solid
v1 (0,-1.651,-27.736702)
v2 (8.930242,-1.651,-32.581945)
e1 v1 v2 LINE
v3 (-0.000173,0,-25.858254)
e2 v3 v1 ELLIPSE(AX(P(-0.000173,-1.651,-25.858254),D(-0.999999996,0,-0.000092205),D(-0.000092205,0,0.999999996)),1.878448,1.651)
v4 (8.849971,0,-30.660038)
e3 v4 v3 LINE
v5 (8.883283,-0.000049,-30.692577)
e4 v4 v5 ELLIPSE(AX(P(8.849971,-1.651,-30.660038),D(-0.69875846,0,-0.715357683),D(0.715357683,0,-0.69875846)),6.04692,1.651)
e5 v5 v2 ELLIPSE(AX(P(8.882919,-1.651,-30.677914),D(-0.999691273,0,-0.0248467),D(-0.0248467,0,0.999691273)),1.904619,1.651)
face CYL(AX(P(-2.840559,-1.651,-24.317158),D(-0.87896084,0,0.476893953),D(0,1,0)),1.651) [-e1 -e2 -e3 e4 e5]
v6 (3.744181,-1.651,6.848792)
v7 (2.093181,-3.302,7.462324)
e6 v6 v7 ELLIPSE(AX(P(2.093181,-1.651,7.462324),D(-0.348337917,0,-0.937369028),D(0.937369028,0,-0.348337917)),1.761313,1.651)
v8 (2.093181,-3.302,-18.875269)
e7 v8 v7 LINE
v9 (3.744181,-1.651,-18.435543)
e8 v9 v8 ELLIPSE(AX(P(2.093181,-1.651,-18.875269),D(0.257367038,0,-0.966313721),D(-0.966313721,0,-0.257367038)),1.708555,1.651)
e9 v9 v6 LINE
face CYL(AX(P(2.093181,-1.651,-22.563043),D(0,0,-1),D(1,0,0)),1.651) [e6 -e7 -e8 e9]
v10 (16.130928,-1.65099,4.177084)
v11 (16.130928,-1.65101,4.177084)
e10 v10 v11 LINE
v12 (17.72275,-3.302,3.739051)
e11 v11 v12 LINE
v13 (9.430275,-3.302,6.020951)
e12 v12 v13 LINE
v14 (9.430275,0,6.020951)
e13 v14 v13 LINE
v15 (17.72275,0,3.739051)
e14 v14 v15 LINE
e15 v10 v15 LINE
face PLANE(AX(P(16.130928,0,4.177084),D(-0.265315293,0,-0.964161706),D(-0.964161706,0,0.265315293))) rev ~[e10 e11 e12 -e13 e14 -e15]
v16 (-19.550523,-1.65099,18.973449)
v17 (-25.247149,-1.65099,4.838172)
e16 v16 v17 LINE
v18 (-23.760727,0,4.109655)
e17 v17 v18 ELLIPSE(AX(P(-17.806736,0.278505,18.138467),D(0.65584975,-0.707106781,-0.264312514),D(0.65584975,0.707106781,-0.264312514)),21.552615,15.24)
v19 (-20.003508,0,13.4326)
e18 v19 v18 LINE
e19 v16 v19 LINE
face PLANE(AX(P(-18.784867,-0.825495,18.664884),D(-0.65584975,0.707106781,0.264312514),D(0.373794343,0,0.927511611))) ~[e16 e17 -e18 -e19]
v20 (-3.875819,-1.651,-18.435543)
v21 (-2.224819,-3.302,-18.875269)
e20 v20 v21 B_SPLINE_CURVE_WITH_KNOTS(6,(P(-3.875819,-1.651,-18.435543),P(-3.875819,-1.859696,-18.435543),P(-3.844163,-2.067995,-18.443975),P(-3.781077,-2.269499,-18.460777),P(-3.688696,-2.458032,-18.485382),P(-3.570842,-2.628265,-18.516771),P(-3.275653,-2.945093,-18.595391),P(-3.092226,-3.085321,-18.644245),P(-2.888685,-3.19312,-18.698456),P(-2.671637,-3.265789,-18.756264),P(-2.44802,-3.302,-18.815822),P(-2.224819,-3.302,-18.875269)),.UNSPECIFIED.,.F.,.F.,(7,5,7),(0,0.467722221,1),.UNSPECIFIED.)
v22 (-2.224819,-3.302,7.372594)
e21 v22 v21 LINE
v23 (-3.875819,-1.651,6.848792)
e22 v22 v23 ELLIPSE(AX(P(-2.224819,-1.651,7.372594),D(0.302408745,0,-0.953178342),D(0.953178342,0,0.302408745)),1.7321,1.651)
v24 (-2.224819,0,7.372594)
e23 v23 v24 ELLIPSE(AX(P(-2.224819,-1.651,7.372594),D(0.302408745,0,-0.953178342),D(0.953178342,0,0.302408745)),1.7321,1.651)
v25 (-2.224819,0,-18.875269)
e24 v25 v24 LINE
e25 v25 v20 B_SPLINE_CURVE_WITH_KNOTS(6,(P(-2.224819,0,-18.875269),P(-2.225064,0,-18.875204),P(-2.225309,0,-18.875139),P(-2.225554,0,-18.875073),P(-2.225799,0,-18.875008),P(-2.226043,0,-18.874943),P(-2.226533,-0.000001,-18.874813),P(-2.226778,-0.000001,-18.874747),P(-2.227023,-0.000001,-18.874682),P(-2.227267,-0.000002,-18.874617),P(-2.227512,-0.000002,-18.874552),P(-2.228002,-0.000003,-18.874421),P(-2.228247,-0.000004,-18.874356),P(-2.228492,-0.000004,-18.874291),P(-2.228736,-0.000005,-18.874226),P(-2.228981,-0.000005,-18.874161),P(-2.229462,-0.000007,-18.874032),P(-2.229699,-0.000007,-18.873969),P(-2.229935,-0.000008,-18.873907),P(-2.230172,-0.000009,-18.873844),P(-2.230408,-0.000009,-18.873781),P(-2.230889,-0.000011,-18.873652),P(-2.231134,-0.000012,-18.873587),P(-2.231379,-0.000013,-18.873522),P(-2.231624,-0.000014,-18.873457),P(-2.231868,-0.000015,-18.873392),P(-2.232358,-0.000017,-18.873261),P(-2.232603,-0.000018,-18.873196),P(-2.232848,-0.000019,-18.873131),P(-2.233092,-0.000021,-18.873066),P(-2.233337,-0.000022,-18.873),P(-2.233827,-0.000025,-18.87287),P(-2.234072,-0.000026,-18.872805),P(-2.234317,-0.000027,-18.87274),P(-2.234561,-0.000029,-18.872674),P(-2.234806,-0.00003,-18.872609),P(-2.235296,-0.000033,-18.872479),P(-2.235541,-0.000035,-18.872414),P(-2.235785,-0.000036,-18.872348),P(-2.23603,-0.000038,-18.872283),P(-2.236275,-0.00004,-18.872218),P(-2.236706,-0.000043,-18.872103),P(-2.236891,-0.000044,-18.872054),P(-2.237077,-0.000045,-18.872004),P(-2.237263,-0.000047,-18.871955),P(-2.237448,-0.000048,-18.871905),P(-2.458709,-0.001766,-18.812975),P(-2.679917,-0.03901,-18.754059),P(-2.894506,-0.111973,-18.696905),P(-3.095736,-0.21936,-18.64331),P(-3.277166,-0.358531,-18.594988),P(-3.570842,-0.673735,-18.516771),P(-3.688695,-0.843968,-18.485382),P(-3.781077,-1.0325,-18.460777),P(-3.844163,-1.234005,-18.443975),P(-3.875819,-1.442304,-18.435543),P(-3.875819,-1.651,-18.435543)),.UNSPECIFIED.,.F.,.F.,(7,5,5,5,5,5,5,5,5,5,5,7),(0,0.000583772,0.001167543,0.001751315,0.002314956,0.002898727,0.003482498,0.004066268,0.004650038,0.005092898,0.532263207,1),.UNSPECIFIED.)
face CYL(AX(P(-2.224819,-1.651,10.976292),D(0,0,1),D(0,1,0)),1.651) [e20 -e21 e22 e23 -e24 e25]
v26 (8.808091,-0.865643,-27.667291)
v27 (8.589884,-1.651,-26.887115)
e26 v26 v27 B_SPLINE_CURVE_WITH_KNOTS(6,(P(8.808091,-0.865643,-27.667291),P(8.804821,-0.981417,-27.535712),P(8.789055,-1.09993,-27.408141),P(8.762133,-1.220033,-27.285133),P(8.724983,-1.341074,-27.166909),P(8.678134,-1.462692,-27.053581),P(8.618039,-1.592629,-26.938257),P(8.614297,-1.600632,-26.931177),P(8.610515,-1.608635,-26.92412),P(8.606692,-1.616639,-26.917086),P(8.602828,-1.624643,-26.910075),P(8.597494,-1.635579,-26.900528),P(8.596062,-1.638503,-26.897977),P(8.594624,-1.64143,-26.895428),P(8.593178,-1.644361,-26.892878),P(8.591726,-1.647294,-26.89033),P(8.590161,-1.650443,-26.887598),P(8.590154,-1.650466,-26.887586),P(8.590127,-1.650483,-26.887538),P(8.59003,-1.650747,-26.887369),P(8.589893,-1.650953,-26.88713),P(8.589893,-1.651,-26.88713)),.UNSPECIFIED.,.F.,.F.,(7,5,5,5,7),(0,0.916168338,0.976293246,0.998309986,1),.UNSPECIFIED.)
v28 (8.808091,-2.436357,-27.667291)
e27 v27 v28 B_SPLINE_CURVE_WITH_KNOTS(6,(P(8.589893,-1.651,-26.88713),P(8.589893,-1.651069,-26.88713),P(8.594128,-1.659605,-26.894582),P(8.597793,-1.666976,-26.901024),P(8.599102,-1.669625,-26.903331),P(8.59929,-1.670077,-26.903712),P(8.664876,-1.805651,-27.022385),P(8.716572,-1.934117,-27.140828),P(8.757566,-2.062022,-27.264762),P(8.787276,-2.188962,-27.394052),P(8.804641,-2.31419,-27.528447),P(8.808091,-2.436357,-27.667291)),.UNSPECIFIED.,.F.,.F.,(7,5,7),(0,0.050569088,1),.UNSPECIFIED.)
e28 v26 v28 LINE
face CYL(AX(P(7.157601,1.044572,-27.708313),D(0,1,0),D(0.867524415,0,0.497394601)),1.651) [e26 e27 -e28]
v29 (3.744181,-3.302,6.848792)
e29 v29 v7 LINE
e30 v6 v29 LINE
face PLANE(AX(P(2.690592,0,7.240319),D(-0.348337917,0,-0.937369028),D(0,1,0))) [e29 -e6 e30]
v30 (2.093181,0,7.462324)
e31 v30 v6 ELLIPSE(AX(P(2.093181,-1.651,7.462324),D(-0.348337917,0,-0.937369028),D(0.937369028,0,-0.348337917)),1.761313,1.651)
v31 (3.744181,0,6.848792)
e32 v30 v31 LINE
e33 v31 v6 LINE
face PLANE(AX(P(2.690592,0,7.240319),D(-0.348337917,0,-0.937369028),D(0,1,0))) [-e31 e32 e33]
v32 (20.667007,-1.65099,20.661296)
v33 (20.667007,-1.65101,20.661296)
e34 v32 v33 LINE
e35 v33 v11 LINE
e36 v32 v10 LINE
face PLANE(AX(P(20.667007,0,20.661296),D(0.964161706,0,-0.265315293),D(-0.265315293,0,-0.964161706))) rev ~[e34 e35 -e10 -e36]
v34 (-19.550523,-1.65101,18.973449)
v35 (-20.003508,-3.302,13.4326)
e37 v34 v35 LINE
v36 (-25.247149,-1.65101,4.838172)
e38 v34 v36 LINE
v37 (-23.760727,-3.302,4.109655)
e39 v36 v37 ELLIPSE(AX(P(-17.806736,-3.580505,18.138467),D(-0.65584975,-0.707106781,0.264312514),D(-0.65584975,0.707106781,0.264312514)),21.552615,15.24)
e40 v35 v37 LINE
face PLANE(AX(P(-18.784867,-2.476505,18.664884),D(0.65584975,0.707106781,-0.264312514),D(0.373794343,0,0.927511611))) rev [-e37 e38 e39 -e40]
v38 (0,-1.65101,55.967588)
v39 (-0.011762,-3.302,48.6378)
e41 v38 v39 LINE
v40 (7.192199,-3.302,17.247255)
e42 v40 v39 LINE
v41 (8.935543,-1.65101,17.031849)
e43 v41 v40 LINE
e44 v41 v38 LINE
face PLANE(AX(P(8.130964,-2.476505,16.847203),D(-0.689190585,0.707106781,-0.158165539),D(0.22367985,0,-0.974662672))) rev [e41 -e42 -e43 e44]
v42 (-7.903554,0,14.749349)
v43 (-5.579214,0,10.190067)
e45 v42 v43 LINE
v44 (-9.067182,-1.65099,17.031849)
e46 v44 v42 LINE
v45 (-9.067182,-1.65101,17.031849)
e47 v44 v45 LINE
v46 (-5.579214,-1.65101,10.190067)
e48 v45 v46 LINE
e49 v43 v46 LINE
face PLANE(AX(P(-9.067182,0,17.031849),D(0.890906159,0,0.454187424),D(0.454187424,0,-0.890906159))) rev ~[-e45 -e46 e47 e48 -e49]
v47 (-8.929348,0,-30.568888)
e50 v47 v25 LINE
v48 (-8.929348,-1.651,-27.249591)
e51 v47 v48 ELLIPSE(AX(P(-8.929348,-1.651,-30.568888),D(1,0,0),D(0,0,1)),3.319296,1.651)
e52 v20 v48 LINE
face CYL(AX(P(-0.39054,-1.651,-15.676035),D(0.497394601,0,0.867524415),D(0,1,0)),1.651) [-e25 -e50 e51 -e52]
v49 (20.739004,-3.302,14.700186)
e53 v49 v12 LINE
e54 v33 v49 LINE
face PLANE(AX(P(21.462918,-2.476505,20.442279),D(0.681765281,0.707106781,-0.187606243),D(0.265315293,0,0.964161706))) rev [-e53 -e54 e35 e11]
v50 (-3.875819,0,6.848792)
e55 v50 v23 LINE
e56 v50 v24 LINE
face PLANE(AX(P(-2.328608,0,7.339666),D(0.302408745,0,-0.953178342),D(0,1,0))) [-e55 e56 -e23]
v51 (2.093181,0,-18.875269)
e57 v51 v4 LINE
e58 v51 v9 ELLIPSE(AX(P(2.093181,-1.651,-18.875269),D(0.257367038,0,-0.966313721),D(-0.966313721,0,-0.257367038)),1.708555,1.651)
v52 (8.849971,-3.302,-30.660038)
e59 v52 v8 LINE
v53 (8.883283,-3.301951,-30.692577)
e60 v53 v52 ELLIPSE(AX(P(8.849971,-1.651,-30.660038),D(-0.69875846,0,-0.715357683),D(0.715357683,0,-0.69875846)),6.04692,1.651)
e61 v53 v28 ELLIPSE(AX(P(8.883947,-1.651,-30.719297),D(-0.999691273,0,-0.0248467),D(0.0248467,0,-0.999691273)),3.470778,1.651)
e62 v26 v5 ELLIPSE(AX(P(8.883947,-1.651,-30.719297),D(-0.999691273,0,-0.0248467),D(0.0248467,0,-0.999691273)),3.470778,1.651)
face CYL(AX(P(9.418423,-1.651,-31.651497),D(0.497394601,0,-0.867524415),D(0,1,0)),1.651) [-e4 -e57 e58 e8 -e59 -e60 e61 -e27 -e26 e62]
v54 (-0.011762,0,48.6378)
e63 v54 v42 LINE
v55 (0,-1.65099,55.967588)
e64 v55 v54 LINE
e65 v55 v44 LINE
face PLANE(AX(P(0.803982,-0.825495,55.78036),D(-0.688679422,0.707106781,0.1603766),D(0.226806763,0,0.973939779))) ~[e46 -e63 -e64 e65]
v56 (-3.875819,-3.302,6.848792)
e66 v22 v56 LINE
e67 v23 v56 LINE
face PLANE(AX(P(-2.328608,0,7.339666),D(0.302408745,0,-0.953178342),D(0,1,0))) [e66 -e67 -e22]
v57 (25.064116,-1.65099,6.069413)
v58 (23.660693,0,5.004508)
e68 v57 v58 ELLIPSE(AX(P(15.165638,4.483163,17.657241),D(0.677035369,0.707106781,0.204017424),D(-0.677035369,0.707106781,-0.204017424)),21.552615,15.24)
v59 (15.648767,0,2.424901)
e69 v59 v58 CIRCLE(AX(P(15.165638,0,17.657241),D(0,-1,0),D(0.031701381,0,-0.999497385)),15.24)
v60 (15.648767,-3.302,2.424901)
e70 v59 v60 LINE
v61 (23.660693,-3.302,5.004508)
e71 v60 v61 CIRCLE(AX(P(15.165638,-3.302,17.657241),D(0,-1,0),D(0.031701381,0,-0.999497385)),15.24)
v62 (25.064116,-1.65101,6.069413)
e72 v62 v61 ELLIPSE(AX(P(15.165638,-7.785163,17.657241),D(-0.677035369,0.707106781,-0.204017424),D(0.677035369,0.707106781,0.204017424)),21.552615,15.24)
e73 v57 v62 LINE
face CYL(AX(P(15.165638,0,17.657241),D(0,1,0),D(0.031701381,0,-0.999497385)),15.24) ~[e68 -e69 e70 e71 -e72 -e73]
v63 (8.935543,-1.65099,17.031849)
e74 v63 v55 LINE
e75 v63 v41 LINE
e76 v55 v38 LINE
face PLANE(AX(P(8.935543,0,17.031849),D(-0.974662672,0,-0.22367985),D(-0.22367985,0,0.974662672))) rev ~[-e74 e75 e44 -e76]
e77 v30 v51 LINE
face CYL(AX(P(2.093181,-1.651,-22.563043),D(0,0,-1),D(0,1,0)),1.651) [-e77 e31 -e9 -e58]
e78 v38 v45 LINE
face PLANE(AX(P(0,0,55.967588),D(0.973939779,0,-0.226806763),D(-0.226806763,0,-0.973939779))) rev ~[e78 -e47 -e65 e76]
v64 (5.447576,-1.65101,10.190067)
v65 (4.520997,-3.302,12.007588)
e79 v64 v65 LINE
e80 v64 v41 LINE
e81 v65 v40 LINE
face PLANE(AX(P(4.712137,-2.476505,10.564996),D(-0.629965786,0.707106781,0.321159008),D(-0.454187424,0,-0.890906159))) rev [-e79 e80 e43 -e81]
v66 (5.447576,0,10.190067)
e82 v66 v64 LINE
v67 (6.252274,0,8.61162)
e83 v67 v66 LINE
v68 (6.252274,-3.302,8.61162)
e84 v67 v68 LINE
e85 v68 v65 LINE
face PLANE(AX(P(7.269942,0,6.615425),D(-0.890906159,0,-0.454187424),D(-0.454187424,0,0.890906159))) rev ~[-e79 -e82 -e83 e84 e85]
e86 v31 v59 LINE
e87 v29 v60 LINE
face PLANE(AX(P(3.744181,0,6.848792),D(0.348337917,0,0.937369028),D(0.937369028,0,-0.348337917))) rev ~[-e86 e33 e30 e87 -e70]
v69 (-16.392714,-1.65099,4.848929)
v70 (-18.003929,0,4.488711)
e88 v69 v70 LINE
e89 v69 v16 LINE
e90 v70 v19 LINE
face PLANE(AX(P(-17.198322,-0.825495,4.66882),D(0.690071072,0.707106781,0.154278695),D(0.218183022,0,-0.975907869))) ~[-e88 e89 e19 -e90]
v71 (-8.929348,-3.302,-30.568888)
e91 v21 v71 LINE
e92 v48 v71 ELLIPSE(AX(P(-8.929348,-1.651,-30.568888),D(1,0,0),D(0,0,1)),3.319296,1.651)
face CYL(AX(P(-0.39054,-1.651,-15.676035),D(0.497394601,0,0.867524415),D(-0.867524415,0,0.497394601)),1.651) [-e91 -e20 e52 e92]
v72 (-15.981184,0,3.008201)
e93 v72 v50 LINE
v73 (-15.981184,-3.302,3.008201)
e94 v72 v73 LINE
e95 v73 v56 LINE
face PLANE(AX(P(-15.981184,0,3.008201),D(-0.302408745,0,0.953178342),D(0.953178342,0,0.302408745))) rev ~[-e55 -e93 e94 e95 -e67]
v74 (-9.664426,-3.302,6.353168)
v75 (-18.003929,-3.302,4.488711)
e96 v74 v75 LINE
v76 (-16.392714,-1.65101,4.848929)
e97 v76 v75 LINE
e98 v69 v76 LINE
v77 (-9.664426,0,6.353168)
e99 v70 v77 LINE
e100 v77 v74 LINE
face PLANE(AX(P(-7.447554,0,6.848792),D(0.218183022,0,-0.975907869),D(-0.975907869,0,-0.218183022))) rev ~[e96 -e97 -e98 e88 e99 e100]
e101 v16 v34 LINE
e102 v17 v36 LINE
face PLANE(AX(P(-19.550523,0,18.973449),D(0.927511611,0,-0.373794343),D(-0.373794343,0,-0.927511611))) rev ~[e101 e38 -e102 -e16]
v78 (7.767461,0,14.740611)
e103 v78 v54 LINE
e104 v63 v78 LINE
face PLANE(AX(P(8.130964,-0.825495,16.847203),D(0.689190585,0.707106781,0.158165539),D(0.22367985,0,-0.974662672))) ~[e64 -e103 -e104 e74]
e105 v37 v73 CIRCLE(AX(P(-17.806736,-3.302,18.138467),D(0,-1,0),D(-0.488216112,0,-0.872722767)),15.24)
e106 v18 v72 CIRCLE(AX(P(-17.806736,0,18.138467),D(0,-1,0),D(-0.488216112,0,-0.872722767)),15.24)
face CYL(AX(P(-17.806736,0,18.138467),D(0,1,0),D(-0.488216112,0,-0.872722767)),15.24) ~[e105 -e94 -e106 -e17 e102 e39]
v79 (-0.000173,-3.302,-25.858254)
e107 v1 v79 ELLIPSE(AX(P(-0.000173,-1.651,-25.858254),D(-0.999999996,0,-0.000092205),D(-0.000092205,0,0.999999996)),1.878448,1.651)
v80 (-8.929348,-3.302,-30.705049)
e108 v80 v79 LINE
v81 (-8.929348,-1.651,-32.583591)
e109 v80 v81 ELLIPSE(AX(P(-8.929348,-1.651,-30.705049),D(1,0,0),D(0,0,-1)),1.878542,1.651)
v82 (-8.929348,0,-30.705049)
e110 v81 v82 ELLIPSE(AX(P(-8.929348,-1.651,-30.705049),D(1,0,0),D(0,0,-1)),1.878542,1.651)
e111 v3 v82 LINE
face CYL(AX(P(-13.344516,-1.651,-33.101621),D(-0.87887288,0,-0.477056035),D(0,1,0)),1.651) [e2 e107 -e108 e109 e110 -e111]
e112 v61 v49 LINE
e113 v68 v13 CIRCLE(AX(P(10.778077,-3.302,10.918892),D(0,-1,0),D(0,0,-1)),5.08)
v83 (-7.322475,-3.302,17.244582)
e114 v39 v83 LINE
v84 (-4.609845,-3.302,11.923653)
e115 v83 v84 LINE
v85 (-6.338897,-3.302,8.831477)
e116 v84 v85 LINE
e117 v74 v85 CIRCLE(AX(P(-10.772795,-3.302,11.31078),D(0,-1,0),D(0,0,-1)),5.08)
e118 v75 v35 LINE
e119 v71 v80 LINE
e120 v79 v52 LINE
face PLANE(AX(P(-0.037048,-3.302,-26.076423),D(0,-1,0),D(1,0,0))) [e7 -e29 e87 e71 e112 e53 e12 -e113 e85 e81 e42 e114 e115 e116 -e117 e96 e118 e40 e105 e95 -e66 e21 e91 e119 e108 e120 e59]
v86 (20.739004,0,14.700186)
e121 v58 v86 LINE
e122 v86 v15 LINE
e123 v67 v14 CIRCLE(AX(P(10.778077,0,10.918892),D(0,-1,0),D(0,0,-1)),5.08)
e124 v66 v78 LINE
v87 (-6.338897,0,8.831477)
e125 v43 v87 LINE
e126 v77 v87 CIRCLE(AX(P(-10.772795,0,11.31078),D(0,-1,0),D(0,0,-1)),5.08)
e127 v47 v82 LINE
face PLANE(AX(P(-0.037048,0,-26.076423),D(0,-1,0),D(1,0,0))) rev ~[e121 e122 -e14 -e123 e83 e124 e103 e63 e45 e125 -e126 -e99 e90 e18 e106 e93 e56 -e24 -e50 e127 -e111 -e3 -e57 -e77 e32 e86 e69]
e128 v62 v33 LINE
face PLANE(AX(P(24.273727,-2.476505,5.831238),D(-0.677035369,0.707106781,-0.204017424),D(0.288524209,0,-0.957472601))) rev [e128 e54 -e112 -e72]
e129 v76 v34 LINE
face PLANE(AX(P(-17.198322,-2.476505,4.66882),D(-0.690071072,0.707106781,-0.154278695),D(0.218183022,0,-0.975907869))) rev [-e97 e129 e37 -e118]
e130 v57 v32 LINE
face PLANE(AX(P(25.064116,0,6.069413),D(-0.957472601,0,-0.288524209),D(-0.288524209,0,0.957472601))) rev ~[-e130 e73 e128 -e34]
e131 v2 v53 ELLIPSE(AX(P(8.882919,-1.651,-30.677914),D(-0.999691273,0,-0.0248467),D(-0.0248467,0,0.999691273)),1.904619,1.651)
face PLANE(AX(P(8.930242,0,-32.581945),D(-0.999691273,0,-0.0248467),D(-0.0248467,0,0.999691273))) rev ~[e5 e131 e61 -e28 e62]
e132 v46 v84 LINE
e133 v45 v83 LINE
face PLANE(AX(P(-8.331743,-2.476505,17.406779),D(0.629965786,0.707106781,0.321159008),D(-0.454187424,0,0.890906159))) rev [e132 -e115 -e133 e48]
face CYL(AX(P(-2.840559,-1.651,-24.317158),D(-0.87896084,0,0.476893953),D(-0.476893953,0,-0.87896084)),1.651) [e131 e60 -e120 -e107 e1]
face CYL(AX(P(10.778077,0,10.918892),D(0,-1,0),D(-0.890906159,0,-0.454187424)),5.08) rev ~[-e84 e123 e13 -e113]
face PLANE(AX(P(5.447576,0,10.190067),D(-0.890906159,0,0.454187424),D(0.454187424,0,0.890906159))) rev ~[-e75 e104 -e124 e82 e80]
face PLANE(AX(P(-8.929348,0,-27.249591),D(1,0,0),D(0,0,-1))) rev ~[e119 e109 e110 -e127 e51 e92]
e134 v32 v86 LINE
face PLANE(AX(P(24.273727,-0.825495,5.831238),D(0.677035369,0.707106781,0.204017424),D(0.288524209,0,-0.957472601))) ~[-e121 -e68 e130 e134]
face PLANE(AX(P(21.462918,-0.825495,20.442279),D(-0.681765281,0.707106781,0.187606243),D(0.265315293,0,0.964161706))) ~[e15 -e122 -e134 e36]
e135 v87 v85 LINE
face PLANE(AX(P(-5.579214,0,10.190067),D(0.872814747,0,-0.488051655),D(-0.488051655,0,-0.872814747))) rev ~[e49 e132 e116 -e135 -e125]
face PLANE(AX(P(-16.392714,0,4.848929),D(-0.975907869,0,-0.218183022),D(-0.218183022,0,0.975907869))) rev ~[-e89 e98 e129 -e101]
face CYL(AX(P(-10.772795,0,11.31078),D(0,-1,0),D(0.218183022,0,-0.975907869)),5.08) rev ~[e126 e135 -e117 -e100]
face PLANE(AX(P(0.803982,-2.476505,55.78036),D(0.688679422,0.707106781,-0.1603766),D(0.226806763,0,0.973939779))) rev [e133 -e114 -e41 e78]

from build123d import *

# Parameters (mm, degrees)
F1_DEPTH      = 3.302
F2_SIZE       = 1.65099
F3_R          = 5.08
F4_T1_DEPTH   = 5.391144251
F4_T6_DEPTH   = 33.5393354473
F4_T12_DEPTH  = 33.5393354473
F4_T18_DEPTH  = 33.5393354473
F4_T24_DEPTH  = 33.5393354473
F4_T30_DEPTH  = 18.415
F4_T35_DEPTH  = 18.415
F4_T40_DEPTH  = 18.415
F4_T45_DEPTH  = 18.415
F4_T50_DEPTH  = 18.415
F4_T55_DEPTH  = 18.415
F4_T60_DEPTH  = 18.415
F4_T65_DEPTH  = 18.415
F4_T71_DEPTH  = 18.415
F4_T75_DEPTH  = 33.5393354473
F4_T82_DEPTH  = 33.5393354473
F4_T86_DEPTH  = 18.415
F4_T93_DEPTH  = 18.415
F4_T97_DEPTH  = 33.5393354473
F4_T104_DEPTH = 33.5393354473
F4_T108_DEPTH = 18.415
F4_T115_DEPTH = 18.415
F4_T119_DEPTH = 18.415
F4_T126_DEPTH = 18.415
F4_T130_DEPTH = 18.415


# Not quite as in the source:
# - a fillet or chamfer that OpenCascade refuses, or shapes differently, is made with other operations: its cross-section is extruded or revolved along the edge and cut away or added
# - a fillet or chamfer is up to 0.001 mm smaller than in the source, because OpenCascade refuses the exact size


with BuildPart() as f1:
    # F0 (on Front) → F1 (new body)
    with BuildSketch(Plane.XZ):
        Polygon((-8.9293484636, -27.2495914251), (-8.9293484636, -32.5835914251), (0, -27.7367021117), (8.9302421297, -32.5819446757), (8.7977098301, -27.2495914251), (3.7441806833, -18.4355433674), (-3.8758193167, -18.4355433674), align=None)
        Polygon((-3.8758193167, 6.8487920798), (-3.8758193167, -18.4355433674), (3.7441806833, -18.4355433674), (3.7441806833, 6.8487920798), (5.4475756045, 10.1900669473), (8.9355429432, 17.0318494737), (0, 55.9675879776), (-9.0671815766, 17.0318494737), (-5.5792142379, 10.1900669473), align=None)
        Polygon((-15.9811842538, 3.0082010134), (-3.8758193167, 6.8487920798), (-5.5792142379, 10.1900669473), (-7.4475542642, 6.8487920798), (-16.3927144946, 4.8489290213), align=None)
        Polygon((5.4475756045, 10.1900669473), (3.7441806833, 6.8487920798), (15.648767343, 2.4249005283), (16.1309282999, 4.1770842273), (7.269941736, 6.61542546), align=None)
        with BuildLine():
            ThreePointArc((-25.2471491773, 4.8381724725), (-20.7595085955, 3.1872557237), (-15.9811842538, 3.0082010134))
            Line((-15.9811842538, 3.0082010134), (-16.3927144946, 4.8489290213))
            Line((-16.3927144946, 4.8489290213), (-19.5505233946, 18.973449431))
            Line((-19.5505233946, 18.973449431), (-25.2471491773, 4.8381724725))
        make_face()
        with BuildLine():
            Line((16.1309282999, 4.1770842273), (15.648767343, 2.4249005283))
            ThreePointArc((15.648767343, 2.4249005283), (20.6670070739, 3.4448326602), (25.0641160129, 6.0694134893))
            Line((25.0641160129, 6.0694134893), (20.6670070739, 20.6612959236))
            Line((20.6670070739, 20.6612959236), (16.1309282999, 4.1770842273))
        make_face()
    extrude(amount=F1_DEPTH)

    # F2 (size 1.651 in the source; OpenCascade refuses exactly that, so slightly less here)
    f2_edges = [f1.edges().sort_by_distance(p)[0] for p in [
        (4.467771, -3.302, 36.499719),
        (-4.533591, -3.302, 36.499719),
        (18.398968, -3.302, 12.41919),
        (22.865562, -3.302, 13.365355),
        (-22.398836, -3.302, 11.905811),
        (-17.971619, -3.302, 11.911189),
        (18.398968, 0, 12.41919),
        (22.865562, 0, 13.365355),
        (-22.398836, 0, 11.905811),
        (-17.971619, 0, 11.911189),
        (7.191559, -3.302, 13.610958),
        (-7.323198, -3.302, 13.610958),
        (4.467771, 0, 36.499719),
        (-4.533591, 0, 36.499719),
    ]]
    chamfer(f2_edges, length=F2_SIZE)

    # F3
    f3_edges = [f1.edges().sort_by_distance(p)[0] for p in [
        (-7.447554, -1.651, 6.848792),
        (7.269942, -1.651, 6.615425),
    ]]
    fillet(f3_edges, radius=F3_R)

    # F4: fillet of radius 1.651 on 13 edges, made by hand

    # F4_s2 → F4_t1 (cut)
    with BuildSketch(Plane.XZ.offset(-1.0445721255)):
        with BuildLine():
            ThreePointArc((8.5898840158, -26.8871146962), (8.7475827705, -27.2636114555), (8.8080914983, -27.6672912803))
            Line((8.8080914983, -27.6672912803), (8.7977098301, -27.2495914251))
            Line((8.7977098301, -27.2495914251), (8.5898840158, -26.8871146962))
        make_face()
    extrude(amount=F4_T1_DEPTH, mode=Mode.SUBTRACT)


with BuildPart() as f4_tool4:
    # F4_s5 → F4_t6 (new body)
    with BuildSketch(Plane.XY.offset(10.9762920798)):
        with BuildLine():
            ThreePointArc((-3.8758193167, -1.651), (-3.3922526125, -2.8184332957), (-2.2248193167, -3.302))
            Line((-2.2248193167, -3.302), (-3.8758193167, -3.302))
            Line((-3.8758193167, -3.302), (-3.8758193167, -1.651))
        make_face()
    extrude(amount=-F4_T6_DEPTH)

    split(bisect_by=Plane(origin=(5.03803687, 0, -2.888555406), x_dir=(0, 1, 0), z_dir=(-0.8675244151, 0, 0.4973946011)), keep=Keep.TOP)

    split(bisect_by=Plane(origin=(-2.3286084058, 0, 7.3396657076), x_dir=(0, 1, 0), z_dir=(0.3024087454, 0, -0.9531783415)), keep=Keep.TOP)


with BuildPart() as f1_1:
    add(f1.part)

    # F4_t3: cut F4_tool4
    add(f4_tool4.part, mode=Mode.SUBTRACT)


with BuildPart() as f4_tool10:
    # F4_s11 → F4_t12 (new body)
    with BuildSketch(Plane.XY.offset(-22.5630433674)):
        with BuildLine():
            ThreePointArc((3.7441806833, -1.651), (3.260613979, -2.8184332957), (2.0931806833, -3.302))
            Line((2.0931806833, -3.302), (3.7441806833, -3.302))
            Line((3.7441806833, -3.302), (3.7441806833, -1.651))
        make_face()
    extrude(amount=F4_T12_DEPTH)

    split(bisect_by=Plane(origin=(2.6905919195, 0, 7.2403186875), x_dir=(0, 1, 0), z_dir=(-0.3483379174, 0, -0.9373690283)), keep=Keep.TOP)

    split(bisect_by=Plane(origin=(-5.1371079227, 0, -2.9453577344), x_dir=(0, 1, 0), z_dir=(0.8675244151, 0, 0.4973946011)), keep=Keep.TOP)


with BuildPart() as f1_2:
    add(f1_1.part)

    # F4_t9: cut F4_tool10
    add(f4_tool10.part, mode=Mode.SUBTRACT)


with BuildPart() as f4_tool16:
    # F4_s17 → F4_t18 (new body)
    with BuildSketch(Plane.XY.offset(10.9762920798)):
        with BuildLine():
            ThreePointArc((-2.2248193167, 0), (-3.3922526125, -0.4835667043), (-3.8758193167, -1.651))
            Line((-3.8758193167, -1.651), (-3.8758193167, 0))
            Line((-3.8758193167, 0), (-2.2248193167, 0))
        make_face()
    extrude(amount=-F4_T18_DEPTH)

    split(bisect_by=Plane(origin=(5.03803687, 0, -2.888555406), x_dir=(0, 1, 0), z_dir=(-0.8675244151, 0, 0.4973946011)), keep=Keep.TOP)

    split(bisect_by=Plane(origin=(-2.3286084058, 0, 7.3396657076), x_dir=(0, 1, 0), z_dir=(0.3024087454, 0, -0.9531783415)), keep=Keep.TOP)


with BuildPart() as f1_3:
    add(f1_2.part)

    # F4_t15: cut F4_tool16
    add(f4_tool16.part, mode=Mode.SUBTRACT)


with BuildPart() as f4_tool22:
    # F4_s23 → F4_t24 (new body)
    with BuildSketch(Plane.XY.offset(-22.5630433674)):
        with BuildLine():
            ThreePointArc((2.0931806833, 0), (3.260613979, -0.4835667043), (3.7441806833, -1.651))
            Line((3.7441806833, -1.651), (3.7441806833, 0))
            Line((3.7441806833, 0), (2.0931806833, 0))
        make_face()
    extrude(amount=F4_T24_DEPTH)

    split(bisect_by=Plane(origin=(2.6905919195, 0, 7.2403186875), x_dir=(0, 1, 0), z_dir=(-0.3483379174, 0, -0.9373690283)), keep=Keep.TOP)

    split(bisect_by=Plane(origin=(-5.1371079227, 0, -2.9453577344), x_dir=(0, 1, 0), z_dir=(0.8675244151, 0, 0.4973946011)), keep=Keep.TOP)


with BuildPart() as f1_4:
    add(f1_3.part)

    # F4_t21: cut F4_tool22
    add(f4_tool22.part, mode=Mode.SUBTRACT)


with BuildPart() as f4_tool28:
    # F4_s29 → F4_t30 (new body)
    with BuildSketch(Plane(origin=(-6.8608599708, 0, -11.966280938), x_dir=(0, 1, 0), z_dir=(-0.4973946011, 0, -0.8675244151))):
        with BuildLine():
            ThreePointArc((0, 7.4583718528), (-0.4835667043, 6.2909385571), (-1.651, 5.8073718528))
            Line((-1.651, 5.8073718528), (0, 5.8073718528))
            Line((0, 5.8073718528), (0, 7.4583718528))
        make_face()
    extrude(amount=F4_T30_DEPTH)

    split(bisect_by=Plane.YZ.offset(-3.8758193167), keep=Keep.BOTTOM)


with BuildPart() as f1_5:
    add(f1_4.part)

    # F4_t27: cut F4_tool28
    add(f4_tool28.part, mode=Mode.SUBTRACT)


with BuildPart() as f4_tool33:
    # F4_s34 → F4_t35 (new body)
    with BuildSketch(Plane(origin=(-6.8608599708, 0, -11.966280938), x_dir=(0, 1, 0), z_dir=(-0.4973946011, 0, -0.8675244151))):
        with BuildLine():
            ThreePointArc((-1.651, 5.8073718528), (-2.8184332957, 6.2909385571), (-3.302, 7.4583718528))
            Line((-3.302, 7.4583718528), (-3.302, 5.8073718528))
            Line((-3.302, 5.8073718528), (-1.651, 5.8073718528))
        make_face()
    extrude(amount=F4_T35_DEPTH)

    split(bisect_by=Plane.YZ.offset(-3.8758193167), keep=Keep.BOTTOM)


with BuildPart() as f1_6:
    add(f1_5.part)

    # F4_t32: cut F4_tool33
    add(f4_tool33.part, mode=Mode.SUBTRACT)


with BuildPart() as f4_tool38:
    # F4_s39 → F4_t40 (new body)
    with BuildSketch(Plane(origin=(-24.1861080645, 0, -13.1283250048), x_dir=(0, 1, 0), z_dir=(0.8788728803, 0, 0.4770560348))):
        with BuildLine():
            ThreePointArc((0, -22.7260352741), (-0.4835667043, -23.8934685698), (-1.651, -24.3770352741))
            Line((-1.651, -24.3770352741), (0, -24.3770352741))
            Line((0, -24.3770352741), (0, -22.7260352741))
        make_face()
    extrude(amount=F4_T40_DEPTH)

    split(bisect_by=Plane(origin=(-11.6264241962, 0, -21.4286037908), x_dir=(0, 1, 0), z_dir=(-0.4768939532, 0, -0.8789608395)), keep=Keep.TOP)


with BuildPart() as f1_7:
    add(f1_6.part)

    # F4_t37: cut F4_tool38
    add(f4_tool38.part, mode=Mode.SUBTRACT)


with BuildPart() as f4_tool43:
    # F4_s44 → F4_t45 (new body)
    with BuildSketch(Plane(origin=(-24.1861080645, 0, -13.1283250048), x_dir=(0, 1, 0), z_dir=(0.8788728803, 0, 0.4770560348))):
        with BuildLine():
            ThreePointArc((-1.651, -24.3770352741), (-2.8184332957, -23.8934685698), (-3.302, -22.7260352741))
            Line((-3.302, -22.7260352741), (-3.302, -24.3770352741))
            Line((-3.302, -24.3770352741), (-1.651, -24.3770352741))
        make_face()
    extrude(amount=F4_T45_DEPTH)

    split(bisect_by=Plane(origin=(-11.6264241962, 0, -21.4286037908), x_dir=(0, 1, 0), z_dir=(-0.4768939532, 0, -0.8789608395)), keep=Keep.TOP)


with BuildPart() as f1_8:
    add(f1_7.part)

    # F4_t42: cut F4_tool43
    add(f4_tool43.part, mode=Mode.SUBTRACT)


with BuildPart() as f4_tool48:
    # F4_s49 → F4_t50 (new body)
    with BuildSketch(Plane(origin=(15.9878139687, 0, -27.8849407141), x_dir=(0, 1, 0), z_dir=(-0.4973946011, 0, 0.8675244151))):
        with BuildLine():
            ThreePointArc((-1.651, 5.9215715813), (-2.8184332957, 6.4051382856), (-3.302, 7.5725715813))
            Line((-3.302, 7.5725715813), (-3.302, 5.9215715813))
            Line((-3.302, 5.9215715813), (-1.651, 5.9215715813))
        make_face()
    extrude(amount=F4_T50_DEPTH)

    split(bisect_by=Plane.YZ.offset(3.7441806833), keep=Keep.TOP)


with BuildPart() as f1_9:
    add(f1_8.part)

    # F4_t47: cut F4_tool48
    add(f4_tool48.part, mode=Mode.SUBTRACT)


with BuildPart() as f4_tool53:
    # F4_s54 → F4_t55 (new body)
    with BuildSketch(Plane(origin=(15.9878139687, 0, -27.8849407141), x_dir=(0, 1, 0), z_dir=(-0.4973946011, 0, 0.8675244151))):
        with BuildLine():
            ThreePointArc((0, 7.5725715813), (-0.4835667043, 6.4051382856), (-1.651, 5.9215715813))
            Line((-1.651, 5.9215715813), (0, 5.9215715813))
            Line((0, 5.9215715813), (0, 7.5725715813))
        make_face()
    extrude(amount=F4_T55_DEPTH)

    split(bisect_by=Plane.YZ.offset(3.7441806833), keep=Keep.TOP)


with BuildPart() as f1_10:
    add(f1_9.part)

    # F4_t52: cut F4_tool53
    add(f4_tool53.part, mode=Mode.SUBTRACT)


with BuildPart() as f4_tool58:
    # F4_s59 → F4_t60 (new body)
    with BuildSketch(Plane(origin=(7.998513331, 0, -4.3397185292), x_dir=(0, 1, 0), z_dir=(0.8789608395, 0, -0.4768939532))):
        with BuildLine():
            ThreePointArc((0, -22.7284749742), (-0.4835667043, -23.8959082699), (-1.651, -24.3794749742))
            Line((-1.651, -24.3794749742), (0, -24.3794749742))
            Line((0, -24.3794749742), (0, -22.7284749742))
        make_face()
    extrude(amount=F4_T60_DEPTH)

    split(bisect_by=Plane(origin=(11.6292117876, 0, -21.4243152038), x_dir=(0, 1, 0), z_dir=(0.4770560348, 0, -0.8788728803)), keep=Keep.TOP)


with BuildPart() as f1_11:
    add(f1_10.part)

    # F4_t57: cut F4_tool58
    add(f4_tool58.part, mode=Mode.SUBTRACT)


with BuildPart() as f4_tool63:
    # F4_s64 → F4_t65 (new body)
    with BuildSketch(Plane(origin=(7.998513331, 0, -4.3397185292), x_dir=(0, 1, 0), z_dir=(0.8789608395, 0, -0.4768939532))):
        with BuildLine():
            ThreePointArc((-1.651, -24.3794749742), (-2.8184332957, -23.8959082699), (-3.302, -22.7284749742))
            Line((-3.302, -22.7284749742), (-3.302, -24.3794749742))
            Line((-3.302, -24.3794749742), (-1.651, -24.3794749742))
        make_face()
    extrude(amount=F4_T65_DEPTH)

    split(bisect_by=Plane(origin=(11.6292117876, 0, -21.4243152038), x_dir=(0, 1, 0), z_dir=(0.4770560348, 0, -0.8788728803)), keep=Keep.TOP)


with BuildPart() as f1_12:
    add(f1_11.part)

    # F4_t62: cut F4_tool63
    add(f4_tool63.part, mode=Mode.SUBTRACT)


with BuildPart() as f4_tool69:
    # F4_s70 → F4_t71 (new body)
    with BuildSketch(Plane(origin=(-6.8608599708, 0, -11.966280938), x_dir=(0, 1, 0), z_dir=(-0.4973946011, 0, -0.8675244151))):
        with BuildLine():
            ThreePointArc((-1.651, 5.8073718528), (-2.8184332957, 6.2909385571), (-3.302, 7.4583718528))
            Line((-3.302, 7.4583718528), (-3.302, 5.8073718528))
            Line((-3.302, 5.8073718528), (-1.651, 5.8073718528))
        make_face()
    extrude(amount=F4_T71_DEPTH)

    split(bisect_by=Plane.YZ.offset(-3.8758193167), keep=Keep.TOP)


with BuildPart() as f4_tool73:
    # F4_s74 → F4_t75 (new body)
    with BuildSketch(Plane.XY.offset(10.9762920798)):
        with BuildLine():
            ThreePointArc((-3.8758193167, -1.651), (-3.3922526125, -2.8184332957), (-2.2248193167, -3.302))
            Line((-2.2248193167, -3.302), (-3.8758193167, -3.302))
            Line((-3.8758193167, -3.302), (-3.8758193167, -1.651))
        make_face()
    extrude(amount=-F4_T75_DEPTH)

    split(bisect_by=Plane(origin=(5.03803687, 0, -2.888555406), x_dir=(0, 1, 0), z_dir=(0.8675244151, 0, -0.4973946011)), keep=Keep.TOP)


with BuildPart() as f4_tool69_1:
    add(f4_tool69.part)

    # F4_t77: intersect F4_tool73
    add(f4_tool73.part, mode=Mode.INTERSECT)


with BuildPart() as f1_13:
    add(f1_12.part)

    # F4_t67: cut F4_tool69
    add(f4_tool69_1.part, mode=Mode.SUBTRACT)


with BuildPart() as f4_tool80:
    # F4_s81 → F4_t82 (new body)
    with BuildSketch(Plane.XY.offset(-22.5630433674)):
        with BuildLine():
            ThreePointArc((3.7441806833, -1.651), (3.260613979, -2.8184332957), (2.0931806833, -3.302))
            Line((2.0931806833, -3.302), (3.7441806833, -3.302))
            Line((3.7441806833, -3.302), (3.7441806833, -1.651))
        make_face()
    extrude(amount=F4_T82_DEPTH)

    split(bisect_by=Plane(origin=(-5.1371079227, 0, -2.9453577344), x_dir=(0, 1, 0), z_dir=(-0.8675244151, 0, -0.4973946011)), keep=Keep.TOP)


with BuildPart() as f4_tool84:
    # F4_s85 → F4_t86 (new body)
    with BuildSketch(Plane(origin=(15.9878139687, 0, -27.8849407141), x_dir=(0, 1, 0), z_dir=(-0.4973946011, 0, 0.8675244151))):
        with BuildLine():
            ThreePointArc((-1.651, 5.9215715813), (-2.8184332957, 6.4051382856), (-3.302, 7.5725715813))
            Line((-3.302, 7.5725715813), (-3.302, 5.9215715813))
            Line((-3.302, 5.9215715813), (-1.651, 5.9215715813))
        make_face()
    extrude(amount=F4_T86_DEPTH)

    split(bisect_by=Plane.YZ.offset(3.7441806833), keep=Keep.BOTTOM)


with BuildPart() as f4_tool80_1:
    add(f4_tool80.part)

    # F4_t88: intersect F4_tool84
    add(f4_tool84.part, mode=Mode.INTERSECT)


with BuildPart() as f1_14:
    add(f1_13.part)

    # F4_t78: cut F4_tool80
    add(f4_tool80_1.part, mode=Mode.SUBTRACT)


with BuildPart() as f4_tool91:
    # F4_s92 → F4_t93 (new body)
    with BuildSketch(Plane(origin=(-6.8608599708, 0, -11.966280938), x_dir=(0, 1, 0), z_dir=(-0.4973946011, 0, -0.8675244151))):
        with BuildLine():
            ThreePointArc((0, 7.4583718528), (-0.4835667043, 6.2909385571), (-1.651, 5.8073718528))
            Line((-1.651, 5.8073718528), (0, 5.8073718528))
            Line((0, 5.8073718528), (0, 7.4583718528))
        make_face()
    extrude(amount=F4_T93_DEPTH)

    split(bisect_by=Plane.YZ.offset(-3.8758193167), keep=Keep.TOP)


with BuildPart() as f4_tool95:
    # F4_s96 → F4_t97 (new body)
    with BuildSketch(Plane.XY.offset(10.9762920798)):
        with BuildLine():
            ThreePointArc((-2.2248193167, 0), (-3.3922526125, -0.4835667043), (-3.8758193167, -1.651))
            Line((-3.8758193167, -1.651), (-3.8758193167, 0))
            Line((-3.8758193167, 0), (-2.2248193167, 0))
        make_face()
    extrude(amount=-F4_T97_DEPTH)

    split(bisect_by=Plane(origin=(5.03803687, 0, -2.888555406), x_dir=(0, 1, 0), z_dir=(0.8675244151, 0, -0.4973946011)), keep=Keep.TOP)


with BuildPart() as f4_tool91_1:
    add(f4_tool91.part)

    # F4_t99: intersect F4_tool95
    add(f4_tool95.part, mode=Mode.INTERSECT)


with BuildPart() as f1_15:
    add(f1_14.part)

    # F4_t89: cut F4_tool91
    add(f4_tool91_1.part, mode=Mode.SUBTRACT)


with BuildPart() as f4_tool102:
    # F4_s103 → F4_t104 (new body)
    with BuildSketch(Plane.XY.offset(-22.5630433674)):
        with BuildLine():
            ThreePointArc((2.0931806833, 0), (3.260613979, -0.4835667043), (3.7441806833, -1.651))
            Line((3.7441806833, -1.651), (3.7441806833, 0))
            Line((3.7441806833, 0), (2.0931806833, 0))
        make_face()
    extrude(amount=F4_T104_DEPTH)

    split(bisect_by=Plane(origin=(-5.1371079227, 0, -2.9453577344), x_dir=(0, 1, 0), z_dir=(-0.8675244151, 0, -0.4973946011)), keep=Keep.TOP)


with BuildPart() as f4_tool106:
    # F4_s107 → F4_t108 (new body)
    with BuildSketch(Plane(origin=(15.9878139687, 0, -27.8849407141), x_dir=(0, 1, 0), z_dir=(-0.4973946011, 0, 0.8675244151))):
        with BuildLine():
            ThreePointArc((0, 7.5725715813), (-0.4835667043, 6.4051382856), (-1.651, 5.9215715813))
            Line((-1.651, 5.9215715813), (0, 5.9215715813))
            Line((0, 5.9215715813), (0, 7.5725715813))
        make_face()
    extrude(amount=F4_T108_DEPTH)

    split(bisect_by=Plane.YZ.offset(3.7441806833), keep=Keep.BOTTOM)


with BuildPart() as f4_tool102_1:
    add(f4_tool102.part)

    # F4_t110: intersect F4_tool106
    add(f4_tool106.part, mode=Mode.INTERSECT)


with BuildPart() as f1_16:
    add(f1_15.part)

    # F4_t100: cut F4_tool102
    add(f4_tool102_1.part, mode=Mode.SUBTRACT)


with BuildPart() as f4_tool113:
    # F4_s114 → F4_t115 (new body)
    with BuildSketch(Plane(origin=(7.998513331, 0, -4.3397185292), x_dir=(0, 1, 0), z_dir=(0.8789608395, 0, -0.4768939532))):
        with BuildLine():
            ThreePointArc((0, -22.7284749742), (-0.4835667043, -23.8959082699), (-1.651, -24.3794749742))
            Line((-1.651, -24.3794749742), (0, -24.3794749742))
            Line((0, -24.3794749742), (0, -22.7284749742))
        make_face()
    extrude(amount=F4_T115_DEPTH)

    split(bisect_by=Plane(origin=(11.6292117876, 0, -21.4243152038), x_dir=(0, 1, 0), z_dir=(-0.4770560348, 0, 0.8788728803)), keep=Keep.TOP)


with BuildPart() as f4_tool117:
    # F4_s118 → F4_t119 (new body)
    with BuildSketch(Plane(origin=(-24.1861080645, 0, -13.1283250048), x_dir=(0, 1, 0), z_dir=(0.8788728803, 0, 0.4770560348))):
        with BuildLine():
            ThreePointArc((0, -22.7260352741), (-0.4835667043, -23.8934685698), (-1.651, -24.3770352741))
            Line((-1.651, -24.3770352741), (0, -24.3770352741))
            Line((0, -24.3770352741), (0, -22.7260352741))
        make_face()
    extrude(amount=F4_T119_DEPTH)

    split(bisect_by=Plane(origin=(-11.6264241962, 0, -21.4286037908), x_dir=(0, 1, 0), z_dir=(0.4768939532, 0, 0.8789608395)), keep=Keep.TOP)


with BuildPart() as f4_tool113_1:
    add(f4_tool113.part)

    # F4_t121: intersect F4_tool117
    add(f4_tool117.part, mode=Mode.INTERSECT)


with BuildPart() as f1_17:
    add(f1_16.part)

    # F4_t111: cut F4_tool113
    add(f4_tool113_1.part, mode=Mode.SUBTRACT)


with BuildPart() as f4_tool124:
    # F4_s125 → F4_t126 (new body)
    with BuildSketch(Plane(origin=(7.998513331, 0, -4.3397185292), x_dir=(0, 1, 0), z_dir=(0.8789608395, 0, -0.4768939532))):
        with BuildLine():
            ThreePointArc((-1.651, -24.3794749742), (-2.8184332957, -23.8959082699), (-3.302, -22.7284749742))
            Line((-3.302, -22.7284749742), (-3.302, -24.3794749742))
            Line((-3.302, -24.3794749742), (-1.651, -24.3794749742))
        make_face()
    extrude(amount=F4_T126_DEPTH)

    split(bisect_by=Plane(origin=(11.6292117876, 0, -21.4243152038), x_dir=(0, 1, 0), z_dir=(-0.4770560348, 0, 0.8788728803)), keep=Keep.TOP)


with BuildPart() as f4_tool128:
    # F4_s129 → F4_t130 (new body)
    with BuildSketch(Plane(origin=(-24.1861080645, 0, -13.1283250048), x_dir=(0, 1, 0), z_dir=(0.8788728803, 0, 0.4770560348))):
        with BuildLine():
            ThreePointArc((-1.651, -24.3770352741), (-2.8184332957, -23.8934685698), (-3.302, -22.7260352741))
            Line((-3.302, -22.7260352741), (-3.302, -24.3770352741))
            Line((-3.302, -24.3770352741), (-1.651, -24.3770352741))
        make_face()
    extrude(amount=F4_T130_DEPTH)

    split(bisect_by=Plane(origin=(-11.6264241962, 0, -21.4286037908), x_dir=(0, 1, 0), z_dir=(0.4768939532, 0, 0.8789608395)), keep=Keep.TOP)


with BuildPart() as f4_tool124_1:
    add(f4_tool124.part)

    # F4_t132: intersect F4_tool128
    add(f4_tool128.part, mode=Mode.INTERSECT)


with BuildPart() as f1_18:
    add(f1_17.part)

    # F4_t122: cut F4_tool124
    add(f4_tool124_1.part, mode=Mode.SUBTRACT)


solid = f1_18.part
